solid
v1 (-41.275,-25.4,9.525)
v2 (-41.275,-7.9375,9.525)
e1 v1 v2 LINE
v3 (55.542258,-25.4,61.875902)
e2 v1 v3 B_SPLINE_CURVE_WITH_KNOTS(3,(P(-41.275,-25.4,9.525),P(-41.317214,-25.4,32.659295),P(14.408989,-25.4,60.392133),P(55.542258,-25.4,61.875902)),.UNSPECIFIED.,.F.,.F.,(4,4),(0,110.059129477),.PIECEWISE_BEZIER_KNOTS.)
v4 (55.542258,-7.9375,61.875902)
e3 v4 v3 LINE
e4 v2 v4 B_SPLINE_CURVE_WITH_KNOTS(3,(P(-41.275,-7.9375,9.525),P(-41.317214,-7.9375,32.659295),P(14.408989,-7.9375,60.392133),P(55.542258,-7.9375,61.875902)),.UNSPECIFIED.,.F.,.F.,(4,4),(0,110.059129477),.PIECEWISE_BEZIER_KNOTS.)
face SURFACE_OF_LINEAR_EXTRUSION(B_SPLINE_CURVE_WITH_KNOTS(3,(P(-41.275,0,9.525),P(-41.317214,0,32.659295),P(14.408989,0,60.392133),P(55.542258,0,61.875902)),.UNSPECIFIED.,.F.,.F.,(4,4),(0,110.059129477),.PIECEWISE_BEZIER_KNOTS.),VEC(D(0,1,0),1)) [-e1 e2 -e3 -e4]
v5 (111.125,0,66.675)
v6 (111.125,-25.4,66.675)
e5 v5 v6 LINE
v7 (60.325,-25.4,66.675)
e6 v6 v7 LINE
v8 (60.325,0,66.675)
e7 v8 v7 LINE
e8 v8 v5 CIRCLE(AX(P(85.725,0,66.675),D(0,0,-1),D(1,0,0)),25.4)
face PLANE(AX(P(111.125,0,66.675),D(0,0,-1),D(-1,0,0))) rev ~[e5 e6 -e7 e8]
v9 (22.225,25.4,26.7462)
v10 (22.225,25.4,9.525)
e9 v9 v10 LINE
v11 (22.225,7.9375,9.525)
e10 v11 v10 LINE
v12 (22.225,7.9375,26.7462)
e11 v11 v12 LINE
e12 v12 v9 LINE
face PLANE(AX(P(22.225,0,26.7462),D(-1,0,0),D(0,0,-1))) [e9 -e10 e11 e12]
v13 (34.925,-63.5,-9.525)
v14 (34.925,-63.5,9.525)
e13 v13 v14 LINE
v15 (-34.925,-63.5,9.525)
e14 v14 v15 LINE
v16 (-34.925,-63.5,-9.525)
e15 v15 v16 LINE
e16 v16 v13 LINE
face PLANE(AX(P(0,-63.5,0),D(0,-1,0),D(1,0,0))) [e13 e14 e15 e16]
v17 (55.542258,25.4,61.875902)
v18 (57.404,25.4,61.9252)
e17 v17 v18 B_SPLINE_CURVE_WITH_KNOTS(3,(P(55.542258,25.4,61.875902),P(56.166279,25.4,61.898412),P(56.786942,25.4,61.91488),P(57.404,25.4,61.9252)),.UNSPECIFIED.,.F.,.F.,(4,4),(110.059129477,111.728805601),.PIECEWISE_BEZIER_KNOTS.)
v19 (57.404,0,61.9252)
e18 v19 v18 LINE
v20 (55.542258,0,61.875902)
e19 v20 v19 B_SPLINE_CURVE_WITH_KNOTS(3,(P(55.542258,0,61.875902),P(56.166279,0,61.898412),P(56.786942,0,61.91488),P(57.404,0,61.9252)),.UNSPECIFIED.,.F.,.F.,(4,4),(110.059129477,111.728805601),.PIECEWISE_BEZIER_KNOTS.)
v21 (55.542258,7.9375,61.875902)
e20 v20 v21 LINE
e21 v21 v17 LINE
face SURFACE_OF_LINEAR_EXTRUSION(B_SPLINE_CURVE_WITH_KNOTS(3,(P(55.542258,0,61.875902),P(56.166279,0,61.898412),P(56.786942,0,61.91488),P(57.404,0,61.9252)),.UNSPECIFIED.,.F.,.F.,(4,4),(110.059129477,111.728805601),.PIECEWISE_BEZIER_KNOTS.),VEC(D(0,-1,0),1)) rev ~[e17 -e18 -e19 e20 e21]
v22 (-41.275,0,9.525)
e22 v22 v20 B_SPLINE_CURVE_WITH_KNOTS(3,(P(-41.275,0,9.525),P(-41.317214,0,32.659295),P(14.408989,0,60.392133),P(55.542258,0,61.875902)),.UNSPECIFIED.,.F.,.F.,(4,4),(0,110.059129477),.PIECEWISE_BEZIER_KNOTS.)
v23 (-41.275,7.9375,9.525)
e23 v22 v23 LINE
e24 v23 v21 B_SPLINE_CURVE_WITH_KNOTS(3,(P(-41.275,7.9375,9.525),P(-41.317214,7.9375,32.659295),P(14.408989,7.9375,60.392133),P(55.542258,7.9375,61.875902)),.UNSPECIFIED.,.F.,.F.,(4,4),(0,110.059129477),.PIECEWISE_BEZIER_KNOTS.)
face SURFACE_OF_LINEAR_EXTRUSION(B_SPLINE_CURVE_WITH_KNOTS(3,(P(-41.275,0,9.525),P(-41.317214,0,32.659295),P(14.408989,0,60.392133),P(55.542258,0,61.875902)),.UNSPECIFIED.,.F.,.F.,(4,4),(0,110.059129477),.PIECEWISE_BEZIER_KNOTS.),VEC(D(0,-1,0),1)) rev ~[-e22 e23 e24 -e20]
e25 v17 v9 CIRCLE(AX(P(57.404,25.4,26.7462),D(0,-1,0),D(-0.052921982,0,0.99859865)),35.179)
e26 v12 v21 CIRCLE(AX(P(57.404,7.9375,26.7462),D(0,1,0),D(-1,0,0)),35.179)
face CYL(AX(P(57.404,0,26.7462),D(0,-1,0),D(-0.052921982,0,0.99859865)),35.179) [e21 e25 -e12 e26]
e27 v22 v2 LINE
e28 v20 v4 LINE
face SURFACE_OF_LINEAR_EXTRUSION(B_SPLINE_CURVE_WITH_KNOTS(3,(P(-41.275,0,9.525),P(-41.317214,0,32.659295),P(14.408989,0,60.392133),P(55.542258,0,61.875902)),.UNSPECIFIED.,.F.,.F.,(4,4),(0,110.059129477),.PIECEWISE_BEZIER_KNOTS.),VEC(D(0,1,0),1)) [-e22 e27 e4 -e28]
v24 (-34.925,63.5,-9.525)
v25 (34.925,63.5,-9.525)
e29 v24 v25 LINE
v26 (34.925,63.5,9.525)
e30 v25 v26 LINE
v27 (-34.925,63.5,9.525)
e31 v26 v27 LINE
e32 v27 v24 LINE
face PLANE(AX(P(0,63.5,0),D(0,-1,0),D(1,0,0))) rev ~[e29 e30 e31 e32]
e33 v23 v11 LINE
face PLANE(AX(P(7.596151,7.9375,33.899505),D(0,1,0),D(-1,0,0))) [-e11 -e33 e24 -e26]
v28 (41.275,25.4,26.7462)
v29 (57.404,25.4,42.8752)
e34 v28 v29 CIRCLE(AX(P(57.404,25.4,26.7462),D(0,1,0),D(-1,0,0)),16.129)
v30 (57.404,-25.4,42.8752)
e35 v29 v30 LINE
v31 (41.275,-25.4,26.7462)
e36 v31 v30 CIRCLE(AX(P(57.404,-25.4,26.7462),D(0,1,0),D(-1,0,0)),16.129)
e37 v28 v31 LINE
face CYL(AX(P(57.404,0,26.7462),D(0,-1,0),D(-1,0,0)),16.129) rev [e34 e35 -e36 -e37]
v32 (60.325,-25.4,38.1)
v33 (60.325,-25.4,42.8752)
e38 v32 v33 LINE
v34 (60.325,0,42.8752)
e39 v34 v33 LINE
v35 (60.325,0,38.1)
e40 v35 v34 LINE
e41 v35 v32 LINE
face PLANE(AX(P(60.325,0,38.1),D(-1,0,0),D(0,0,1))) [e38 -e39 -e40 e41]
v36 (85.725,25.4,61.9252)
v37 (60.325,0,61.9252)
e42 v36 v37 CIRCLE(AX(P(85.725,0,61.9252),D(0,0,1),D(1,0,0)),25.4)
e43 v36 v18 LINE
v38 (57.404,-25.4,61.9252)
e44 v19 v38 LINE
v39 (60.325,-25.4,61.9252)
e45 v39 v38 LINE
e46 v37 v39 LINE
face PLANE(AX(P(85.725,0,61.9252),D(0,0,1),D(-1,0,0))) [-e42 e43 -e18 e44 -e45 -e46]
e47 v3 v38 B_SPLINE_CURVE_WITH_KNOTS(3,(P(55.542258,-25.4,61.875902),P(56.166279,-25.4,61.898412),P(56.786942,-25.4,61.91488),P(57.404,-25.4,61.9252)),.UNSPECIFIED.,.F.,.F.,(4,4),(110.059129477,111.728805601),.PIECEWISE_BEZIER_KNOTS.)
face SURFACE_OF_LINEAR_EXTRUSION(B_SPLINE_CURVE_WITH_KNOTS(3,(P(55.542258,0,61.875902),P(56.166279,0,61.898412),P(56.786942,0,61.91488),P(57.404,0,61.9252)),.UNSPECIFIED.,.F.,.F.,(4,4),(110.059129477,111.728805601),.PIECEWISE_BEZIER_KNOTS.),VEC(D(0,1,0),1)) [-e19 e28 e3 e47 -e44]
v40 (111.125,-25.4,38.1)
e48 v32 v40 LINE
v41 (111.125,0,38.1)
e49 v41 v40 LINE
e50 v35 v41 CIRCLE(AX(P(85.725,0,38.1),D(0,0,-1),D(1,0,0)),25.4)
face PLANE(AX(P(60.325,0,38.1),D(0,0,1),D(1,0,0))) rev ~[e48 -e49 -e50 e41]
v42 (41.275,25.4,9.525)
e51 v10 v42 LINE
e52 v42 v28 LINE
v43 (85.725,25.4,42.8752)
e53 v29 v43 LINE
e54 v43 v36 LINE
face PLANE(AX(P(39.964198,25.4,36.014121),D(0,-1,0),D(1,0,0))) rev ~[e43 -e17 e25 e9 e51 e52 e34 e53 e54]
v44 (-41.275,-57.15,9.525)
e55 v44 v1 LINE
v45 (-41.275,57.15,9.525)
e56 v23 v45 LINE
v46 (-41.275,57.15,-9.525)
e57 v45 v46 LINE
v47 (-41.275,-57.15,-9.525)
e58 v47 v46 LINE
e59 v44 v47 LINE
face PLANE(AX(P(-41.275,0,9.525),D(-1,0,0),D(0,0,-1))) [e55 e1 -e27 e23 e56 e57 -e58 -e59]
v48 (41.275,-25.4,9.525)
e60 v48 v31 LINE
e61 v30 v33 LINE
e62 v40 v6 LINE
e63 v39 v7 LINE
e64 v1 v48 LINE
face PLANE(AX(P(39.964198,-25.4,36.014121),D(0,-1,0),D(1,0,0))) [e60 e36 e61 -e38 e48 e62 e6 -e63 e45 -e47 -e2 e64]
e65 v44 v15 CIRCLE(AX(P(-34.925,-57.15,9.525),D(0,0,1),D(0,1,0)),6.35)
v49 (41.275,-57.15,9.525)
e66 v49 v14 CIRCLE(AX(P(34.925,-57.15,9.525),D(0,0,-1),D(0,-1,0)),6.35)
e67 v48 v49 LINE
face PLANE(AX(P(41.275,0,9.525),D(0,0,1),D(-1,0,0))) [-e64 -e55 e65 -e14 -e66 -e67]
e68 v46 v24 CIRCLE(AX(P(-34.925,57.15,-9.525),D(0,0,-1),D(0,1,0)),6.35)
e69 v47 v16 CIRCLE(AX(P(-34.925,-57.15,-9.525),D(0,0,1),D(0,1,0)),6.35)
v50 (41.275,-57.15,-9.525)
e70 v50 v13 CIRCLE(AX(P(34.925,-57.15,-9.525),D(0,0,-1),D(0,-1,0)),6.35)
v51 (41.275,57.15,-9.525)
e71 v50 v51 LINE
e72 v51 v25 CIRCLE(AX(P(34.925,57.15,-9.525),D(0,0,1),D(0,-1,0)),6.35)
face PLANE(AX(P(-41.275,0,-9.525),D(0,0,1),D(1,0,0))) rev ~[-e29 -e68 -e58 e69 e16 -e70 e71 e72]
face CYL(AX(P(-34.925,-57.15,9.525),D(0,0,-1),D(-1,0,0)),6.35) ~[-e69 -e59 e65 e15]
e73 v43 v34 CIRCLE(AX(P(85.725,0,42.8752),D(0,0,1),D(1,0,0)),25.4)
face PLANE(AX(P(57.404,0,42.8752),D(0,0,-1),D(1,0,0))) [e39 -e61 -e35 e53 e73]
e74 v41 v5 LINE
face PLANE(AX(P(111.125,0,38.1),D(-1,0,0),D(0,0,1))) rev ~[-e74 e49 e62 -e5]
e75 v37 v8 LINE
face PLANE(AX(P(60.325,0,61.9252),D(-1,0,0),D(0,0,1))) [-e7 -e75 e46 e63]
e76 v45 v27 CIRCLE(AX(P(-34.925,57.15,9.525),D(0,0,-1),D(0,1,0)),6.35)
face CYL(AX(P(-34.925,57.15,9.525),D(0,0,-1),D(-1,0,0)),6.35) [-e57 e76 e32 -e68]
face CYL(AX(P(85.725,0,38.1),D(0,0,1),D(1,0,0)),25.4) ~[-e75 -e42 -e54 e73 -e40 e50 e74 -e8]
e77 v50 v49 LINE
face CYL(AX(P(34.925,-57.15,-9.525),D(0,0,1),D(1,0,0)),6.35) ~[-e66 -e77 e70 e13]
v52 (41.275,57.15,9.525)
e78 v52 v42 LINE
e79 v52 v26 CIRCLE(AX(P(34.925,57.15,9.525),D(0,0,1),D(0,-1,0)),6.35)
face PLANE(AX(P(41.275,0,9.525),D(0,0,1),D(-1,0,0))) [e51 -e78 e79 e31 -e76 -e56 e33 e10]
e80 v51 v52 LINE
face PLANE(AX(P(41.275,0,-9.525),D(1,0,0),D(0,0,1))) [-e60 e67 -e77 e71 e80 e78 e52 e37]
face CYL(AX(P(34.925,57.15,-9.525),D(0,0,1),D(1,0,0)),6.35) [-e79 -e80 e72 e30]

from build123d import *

# Parameters (mm, degrees)
F1_DEPTH = 63.5
F0_W     = 25.4
F0_H     = 19.05
F2_DEPTH = 25.4
F3_DEPTH = 7.9375
F5_R     = 6.35
F0_H_2   = 4.7752
F0_H_3   = 4.7498
F6_DEPTH = 25.4


with BuildPart() as f1:
    # F0 (on Front) → F1 (new body, symmetric)
    with BuildSketch(Plane.XZ):
        Polygon((-41.275, -9.525), (41.275, -9.525), (41.275, 9.525), (22.225, 9.525), (-41.275, 9.525), align=None)
    extrude(amount=F1_DEPTH, both=True)

    # F0 (on Front) → F2 (join, symmetric)
    with BuildSketch(Plane.XZ):
        with BuildLine():
            Line((22.225, 9.525), (41.275, 9.525))
            Line((41.275, 9.525), (41.275, 26.7462))
            ThreePointArc((41.275, 26.7462), (45.9990747262, 38.1511252738), (57.404, 42.8752))
            Line((57.404, 42.8752), (60.325, 42.8752))
            Line((60.325, 42.8752), (60.325, 61.9252))
            Line((60.325, 61.9252), (57.404, 61.9252))
            add(Edge.make_bspline(
                [(55.5422575952, 61.875901909), (56.1662788609, 61.89841175), (56.7869415526, 61.914880349), (57.404, 61.9252)],
                knots=[110.0591294768, 110.0591294768, 110.0591294768, 110.0591294768, 111.7288056011, 111.7288056011, 111.7288056011, 111.7288056011], degree=3))
            ThreePointArc((55.5422575952, 61.875901909), (31.8789507634, 50.9543371128), (22.225, 26.7462))
            Line((22.225, 26.7462), (22.225, 9.525))
        make_face()
        with Locations((73.025, 52.4002)):
            Rectangle(F0_W, F0_H)
    extrude(amount=F2_DEPTH, both=True)

    # F0 (on Front) → F3 (join, symmetric)
    with BuildSketch(Plane.XZ):
        with BuildLine():
            add(Edge.make_bspline(
                [(-41.275, 9.525), (-41.317213665, 32.6592953767), (14.4089885277, 60.3921330151), (55.5422575952, 61.875901909)],
                knots=[0, 0, 0, 0, 110.0591294768, 110.0591294768, 110.0591294768, 110.0591294768], degree=3))
            Line((-41.275, 9.525), (22.225, 9.525))
            Line((22.225, 9.525), (22.225, 26.7462))
            ThreePointArc((22.225, 26.7462), (31.8789507634, 50.9543371128), (55.5422575952, 61.875901909))
        make_face()
    extrude(amount=F3_DEPTH, both=True)

    # F0 (on Front) → F4 (revolve)
    with BuildSketch(Plane.XZ):
        Polygon((85.725, 61.9252), (85.725, 42.8752), (85.725, 38.1), (111.125, 38.1), (111.125, 66.675), (85.725, 66.675), align=None)
    revolve(axis=Axis((85.725, 0, 52.3875), (0, 0, -1)))

    # F5
    f5_edges = [f1.edges().sort_by_distance(p)[0] for p in [
        (-41.275, -63.5, 0),
        (41.275, -63.5, 0),
        (-41.275, 63.5, 0),
        (41.275, 63.5, 0),
    ]]
    fillet(f5_edges, radius=F5_R)

    # F0 (on Front) → F6 (join)
    with BuildSketch(Plane.XZ):
        Polygon((-41.275, -9.525), (41.275, -9.525), (41.275, 9.525), (22.225, 9.525), (-41.275, 9.525), align=None)
        with BuildLine():
            Line((22.225, 9.525), (41.275, 9.525))
            Line((41.275, 9.525), (41.275, 26.7462))
            ThreePointArc((41.275, 26.7462), (45.9990747262, 38.1511252738), (57.404, 42.8752))
            Line((57.404, 42.8752), (60.325, 42.8752))
            Line((60.325, 42.8752), (60.325, 61.9252))
            Line((60.325, 61.9252), (57.404, 61.9252))
            add(Edge.make_bspline(
                [(55.5422575952, 61.875901909), (56.1662788609, 61.89841175), (56.7869415526, 61.914880349), (57.404, 61.9252)],
                knots=[110.0591294768, 110.0591294768, 110.0591294768, 110.0591294768, 111.7288056011, 111.7288056011, 111.7288056011, 111.7288056011], degree=3))
            ThreePointArc((55.5422575952, 61.875901909), (31.8789507634, 50.9543371128), (22.225, 26.7462))
            Line((22.225, 26.7462), (22.225, 9.525))
        make_face()
        with BuildLine():
            add(Edge.make_bspline(
                [(-41.275, 9.525), (-41.317213665, 32.6592953767), (14.4089885277, 60.3921330151), (55.5422575952, 61.875901909)],
                knots=[0, 0, 0, 0, 110.0591294768, 110.0591294768, 110.0591294768, 110.0591294768], degree=3))
            Line((-41.275, 9.525), (22.225, 9.525))
            Line((22.225, 9.525), (22.225, 26.7462))
            ThreePointArc((22.225, 26.7462), (31.8789507634, 50.9543371128), (55.5422575952, 61.875901909))
        make_face()
        with Locations((73.025, 40.4876)):
            Rectangle(F0_W, F0_H_2)
        with Locations((73.025, 52.4002)):
            Rectangle(F0_W, F0_H)
        with Locations((73.025, 64.3001)):
            Rectangle(F0_W, F0_H_3)
        Polygon((85.725, 61.9252), (85.725, 42.8752), (85.725, 38.1), (111.125, 38.1), (111.125, 66.675), (85.725, 66.675), align=None)
    extrude(amount=F6_DEPTH)


solid = f1.part
